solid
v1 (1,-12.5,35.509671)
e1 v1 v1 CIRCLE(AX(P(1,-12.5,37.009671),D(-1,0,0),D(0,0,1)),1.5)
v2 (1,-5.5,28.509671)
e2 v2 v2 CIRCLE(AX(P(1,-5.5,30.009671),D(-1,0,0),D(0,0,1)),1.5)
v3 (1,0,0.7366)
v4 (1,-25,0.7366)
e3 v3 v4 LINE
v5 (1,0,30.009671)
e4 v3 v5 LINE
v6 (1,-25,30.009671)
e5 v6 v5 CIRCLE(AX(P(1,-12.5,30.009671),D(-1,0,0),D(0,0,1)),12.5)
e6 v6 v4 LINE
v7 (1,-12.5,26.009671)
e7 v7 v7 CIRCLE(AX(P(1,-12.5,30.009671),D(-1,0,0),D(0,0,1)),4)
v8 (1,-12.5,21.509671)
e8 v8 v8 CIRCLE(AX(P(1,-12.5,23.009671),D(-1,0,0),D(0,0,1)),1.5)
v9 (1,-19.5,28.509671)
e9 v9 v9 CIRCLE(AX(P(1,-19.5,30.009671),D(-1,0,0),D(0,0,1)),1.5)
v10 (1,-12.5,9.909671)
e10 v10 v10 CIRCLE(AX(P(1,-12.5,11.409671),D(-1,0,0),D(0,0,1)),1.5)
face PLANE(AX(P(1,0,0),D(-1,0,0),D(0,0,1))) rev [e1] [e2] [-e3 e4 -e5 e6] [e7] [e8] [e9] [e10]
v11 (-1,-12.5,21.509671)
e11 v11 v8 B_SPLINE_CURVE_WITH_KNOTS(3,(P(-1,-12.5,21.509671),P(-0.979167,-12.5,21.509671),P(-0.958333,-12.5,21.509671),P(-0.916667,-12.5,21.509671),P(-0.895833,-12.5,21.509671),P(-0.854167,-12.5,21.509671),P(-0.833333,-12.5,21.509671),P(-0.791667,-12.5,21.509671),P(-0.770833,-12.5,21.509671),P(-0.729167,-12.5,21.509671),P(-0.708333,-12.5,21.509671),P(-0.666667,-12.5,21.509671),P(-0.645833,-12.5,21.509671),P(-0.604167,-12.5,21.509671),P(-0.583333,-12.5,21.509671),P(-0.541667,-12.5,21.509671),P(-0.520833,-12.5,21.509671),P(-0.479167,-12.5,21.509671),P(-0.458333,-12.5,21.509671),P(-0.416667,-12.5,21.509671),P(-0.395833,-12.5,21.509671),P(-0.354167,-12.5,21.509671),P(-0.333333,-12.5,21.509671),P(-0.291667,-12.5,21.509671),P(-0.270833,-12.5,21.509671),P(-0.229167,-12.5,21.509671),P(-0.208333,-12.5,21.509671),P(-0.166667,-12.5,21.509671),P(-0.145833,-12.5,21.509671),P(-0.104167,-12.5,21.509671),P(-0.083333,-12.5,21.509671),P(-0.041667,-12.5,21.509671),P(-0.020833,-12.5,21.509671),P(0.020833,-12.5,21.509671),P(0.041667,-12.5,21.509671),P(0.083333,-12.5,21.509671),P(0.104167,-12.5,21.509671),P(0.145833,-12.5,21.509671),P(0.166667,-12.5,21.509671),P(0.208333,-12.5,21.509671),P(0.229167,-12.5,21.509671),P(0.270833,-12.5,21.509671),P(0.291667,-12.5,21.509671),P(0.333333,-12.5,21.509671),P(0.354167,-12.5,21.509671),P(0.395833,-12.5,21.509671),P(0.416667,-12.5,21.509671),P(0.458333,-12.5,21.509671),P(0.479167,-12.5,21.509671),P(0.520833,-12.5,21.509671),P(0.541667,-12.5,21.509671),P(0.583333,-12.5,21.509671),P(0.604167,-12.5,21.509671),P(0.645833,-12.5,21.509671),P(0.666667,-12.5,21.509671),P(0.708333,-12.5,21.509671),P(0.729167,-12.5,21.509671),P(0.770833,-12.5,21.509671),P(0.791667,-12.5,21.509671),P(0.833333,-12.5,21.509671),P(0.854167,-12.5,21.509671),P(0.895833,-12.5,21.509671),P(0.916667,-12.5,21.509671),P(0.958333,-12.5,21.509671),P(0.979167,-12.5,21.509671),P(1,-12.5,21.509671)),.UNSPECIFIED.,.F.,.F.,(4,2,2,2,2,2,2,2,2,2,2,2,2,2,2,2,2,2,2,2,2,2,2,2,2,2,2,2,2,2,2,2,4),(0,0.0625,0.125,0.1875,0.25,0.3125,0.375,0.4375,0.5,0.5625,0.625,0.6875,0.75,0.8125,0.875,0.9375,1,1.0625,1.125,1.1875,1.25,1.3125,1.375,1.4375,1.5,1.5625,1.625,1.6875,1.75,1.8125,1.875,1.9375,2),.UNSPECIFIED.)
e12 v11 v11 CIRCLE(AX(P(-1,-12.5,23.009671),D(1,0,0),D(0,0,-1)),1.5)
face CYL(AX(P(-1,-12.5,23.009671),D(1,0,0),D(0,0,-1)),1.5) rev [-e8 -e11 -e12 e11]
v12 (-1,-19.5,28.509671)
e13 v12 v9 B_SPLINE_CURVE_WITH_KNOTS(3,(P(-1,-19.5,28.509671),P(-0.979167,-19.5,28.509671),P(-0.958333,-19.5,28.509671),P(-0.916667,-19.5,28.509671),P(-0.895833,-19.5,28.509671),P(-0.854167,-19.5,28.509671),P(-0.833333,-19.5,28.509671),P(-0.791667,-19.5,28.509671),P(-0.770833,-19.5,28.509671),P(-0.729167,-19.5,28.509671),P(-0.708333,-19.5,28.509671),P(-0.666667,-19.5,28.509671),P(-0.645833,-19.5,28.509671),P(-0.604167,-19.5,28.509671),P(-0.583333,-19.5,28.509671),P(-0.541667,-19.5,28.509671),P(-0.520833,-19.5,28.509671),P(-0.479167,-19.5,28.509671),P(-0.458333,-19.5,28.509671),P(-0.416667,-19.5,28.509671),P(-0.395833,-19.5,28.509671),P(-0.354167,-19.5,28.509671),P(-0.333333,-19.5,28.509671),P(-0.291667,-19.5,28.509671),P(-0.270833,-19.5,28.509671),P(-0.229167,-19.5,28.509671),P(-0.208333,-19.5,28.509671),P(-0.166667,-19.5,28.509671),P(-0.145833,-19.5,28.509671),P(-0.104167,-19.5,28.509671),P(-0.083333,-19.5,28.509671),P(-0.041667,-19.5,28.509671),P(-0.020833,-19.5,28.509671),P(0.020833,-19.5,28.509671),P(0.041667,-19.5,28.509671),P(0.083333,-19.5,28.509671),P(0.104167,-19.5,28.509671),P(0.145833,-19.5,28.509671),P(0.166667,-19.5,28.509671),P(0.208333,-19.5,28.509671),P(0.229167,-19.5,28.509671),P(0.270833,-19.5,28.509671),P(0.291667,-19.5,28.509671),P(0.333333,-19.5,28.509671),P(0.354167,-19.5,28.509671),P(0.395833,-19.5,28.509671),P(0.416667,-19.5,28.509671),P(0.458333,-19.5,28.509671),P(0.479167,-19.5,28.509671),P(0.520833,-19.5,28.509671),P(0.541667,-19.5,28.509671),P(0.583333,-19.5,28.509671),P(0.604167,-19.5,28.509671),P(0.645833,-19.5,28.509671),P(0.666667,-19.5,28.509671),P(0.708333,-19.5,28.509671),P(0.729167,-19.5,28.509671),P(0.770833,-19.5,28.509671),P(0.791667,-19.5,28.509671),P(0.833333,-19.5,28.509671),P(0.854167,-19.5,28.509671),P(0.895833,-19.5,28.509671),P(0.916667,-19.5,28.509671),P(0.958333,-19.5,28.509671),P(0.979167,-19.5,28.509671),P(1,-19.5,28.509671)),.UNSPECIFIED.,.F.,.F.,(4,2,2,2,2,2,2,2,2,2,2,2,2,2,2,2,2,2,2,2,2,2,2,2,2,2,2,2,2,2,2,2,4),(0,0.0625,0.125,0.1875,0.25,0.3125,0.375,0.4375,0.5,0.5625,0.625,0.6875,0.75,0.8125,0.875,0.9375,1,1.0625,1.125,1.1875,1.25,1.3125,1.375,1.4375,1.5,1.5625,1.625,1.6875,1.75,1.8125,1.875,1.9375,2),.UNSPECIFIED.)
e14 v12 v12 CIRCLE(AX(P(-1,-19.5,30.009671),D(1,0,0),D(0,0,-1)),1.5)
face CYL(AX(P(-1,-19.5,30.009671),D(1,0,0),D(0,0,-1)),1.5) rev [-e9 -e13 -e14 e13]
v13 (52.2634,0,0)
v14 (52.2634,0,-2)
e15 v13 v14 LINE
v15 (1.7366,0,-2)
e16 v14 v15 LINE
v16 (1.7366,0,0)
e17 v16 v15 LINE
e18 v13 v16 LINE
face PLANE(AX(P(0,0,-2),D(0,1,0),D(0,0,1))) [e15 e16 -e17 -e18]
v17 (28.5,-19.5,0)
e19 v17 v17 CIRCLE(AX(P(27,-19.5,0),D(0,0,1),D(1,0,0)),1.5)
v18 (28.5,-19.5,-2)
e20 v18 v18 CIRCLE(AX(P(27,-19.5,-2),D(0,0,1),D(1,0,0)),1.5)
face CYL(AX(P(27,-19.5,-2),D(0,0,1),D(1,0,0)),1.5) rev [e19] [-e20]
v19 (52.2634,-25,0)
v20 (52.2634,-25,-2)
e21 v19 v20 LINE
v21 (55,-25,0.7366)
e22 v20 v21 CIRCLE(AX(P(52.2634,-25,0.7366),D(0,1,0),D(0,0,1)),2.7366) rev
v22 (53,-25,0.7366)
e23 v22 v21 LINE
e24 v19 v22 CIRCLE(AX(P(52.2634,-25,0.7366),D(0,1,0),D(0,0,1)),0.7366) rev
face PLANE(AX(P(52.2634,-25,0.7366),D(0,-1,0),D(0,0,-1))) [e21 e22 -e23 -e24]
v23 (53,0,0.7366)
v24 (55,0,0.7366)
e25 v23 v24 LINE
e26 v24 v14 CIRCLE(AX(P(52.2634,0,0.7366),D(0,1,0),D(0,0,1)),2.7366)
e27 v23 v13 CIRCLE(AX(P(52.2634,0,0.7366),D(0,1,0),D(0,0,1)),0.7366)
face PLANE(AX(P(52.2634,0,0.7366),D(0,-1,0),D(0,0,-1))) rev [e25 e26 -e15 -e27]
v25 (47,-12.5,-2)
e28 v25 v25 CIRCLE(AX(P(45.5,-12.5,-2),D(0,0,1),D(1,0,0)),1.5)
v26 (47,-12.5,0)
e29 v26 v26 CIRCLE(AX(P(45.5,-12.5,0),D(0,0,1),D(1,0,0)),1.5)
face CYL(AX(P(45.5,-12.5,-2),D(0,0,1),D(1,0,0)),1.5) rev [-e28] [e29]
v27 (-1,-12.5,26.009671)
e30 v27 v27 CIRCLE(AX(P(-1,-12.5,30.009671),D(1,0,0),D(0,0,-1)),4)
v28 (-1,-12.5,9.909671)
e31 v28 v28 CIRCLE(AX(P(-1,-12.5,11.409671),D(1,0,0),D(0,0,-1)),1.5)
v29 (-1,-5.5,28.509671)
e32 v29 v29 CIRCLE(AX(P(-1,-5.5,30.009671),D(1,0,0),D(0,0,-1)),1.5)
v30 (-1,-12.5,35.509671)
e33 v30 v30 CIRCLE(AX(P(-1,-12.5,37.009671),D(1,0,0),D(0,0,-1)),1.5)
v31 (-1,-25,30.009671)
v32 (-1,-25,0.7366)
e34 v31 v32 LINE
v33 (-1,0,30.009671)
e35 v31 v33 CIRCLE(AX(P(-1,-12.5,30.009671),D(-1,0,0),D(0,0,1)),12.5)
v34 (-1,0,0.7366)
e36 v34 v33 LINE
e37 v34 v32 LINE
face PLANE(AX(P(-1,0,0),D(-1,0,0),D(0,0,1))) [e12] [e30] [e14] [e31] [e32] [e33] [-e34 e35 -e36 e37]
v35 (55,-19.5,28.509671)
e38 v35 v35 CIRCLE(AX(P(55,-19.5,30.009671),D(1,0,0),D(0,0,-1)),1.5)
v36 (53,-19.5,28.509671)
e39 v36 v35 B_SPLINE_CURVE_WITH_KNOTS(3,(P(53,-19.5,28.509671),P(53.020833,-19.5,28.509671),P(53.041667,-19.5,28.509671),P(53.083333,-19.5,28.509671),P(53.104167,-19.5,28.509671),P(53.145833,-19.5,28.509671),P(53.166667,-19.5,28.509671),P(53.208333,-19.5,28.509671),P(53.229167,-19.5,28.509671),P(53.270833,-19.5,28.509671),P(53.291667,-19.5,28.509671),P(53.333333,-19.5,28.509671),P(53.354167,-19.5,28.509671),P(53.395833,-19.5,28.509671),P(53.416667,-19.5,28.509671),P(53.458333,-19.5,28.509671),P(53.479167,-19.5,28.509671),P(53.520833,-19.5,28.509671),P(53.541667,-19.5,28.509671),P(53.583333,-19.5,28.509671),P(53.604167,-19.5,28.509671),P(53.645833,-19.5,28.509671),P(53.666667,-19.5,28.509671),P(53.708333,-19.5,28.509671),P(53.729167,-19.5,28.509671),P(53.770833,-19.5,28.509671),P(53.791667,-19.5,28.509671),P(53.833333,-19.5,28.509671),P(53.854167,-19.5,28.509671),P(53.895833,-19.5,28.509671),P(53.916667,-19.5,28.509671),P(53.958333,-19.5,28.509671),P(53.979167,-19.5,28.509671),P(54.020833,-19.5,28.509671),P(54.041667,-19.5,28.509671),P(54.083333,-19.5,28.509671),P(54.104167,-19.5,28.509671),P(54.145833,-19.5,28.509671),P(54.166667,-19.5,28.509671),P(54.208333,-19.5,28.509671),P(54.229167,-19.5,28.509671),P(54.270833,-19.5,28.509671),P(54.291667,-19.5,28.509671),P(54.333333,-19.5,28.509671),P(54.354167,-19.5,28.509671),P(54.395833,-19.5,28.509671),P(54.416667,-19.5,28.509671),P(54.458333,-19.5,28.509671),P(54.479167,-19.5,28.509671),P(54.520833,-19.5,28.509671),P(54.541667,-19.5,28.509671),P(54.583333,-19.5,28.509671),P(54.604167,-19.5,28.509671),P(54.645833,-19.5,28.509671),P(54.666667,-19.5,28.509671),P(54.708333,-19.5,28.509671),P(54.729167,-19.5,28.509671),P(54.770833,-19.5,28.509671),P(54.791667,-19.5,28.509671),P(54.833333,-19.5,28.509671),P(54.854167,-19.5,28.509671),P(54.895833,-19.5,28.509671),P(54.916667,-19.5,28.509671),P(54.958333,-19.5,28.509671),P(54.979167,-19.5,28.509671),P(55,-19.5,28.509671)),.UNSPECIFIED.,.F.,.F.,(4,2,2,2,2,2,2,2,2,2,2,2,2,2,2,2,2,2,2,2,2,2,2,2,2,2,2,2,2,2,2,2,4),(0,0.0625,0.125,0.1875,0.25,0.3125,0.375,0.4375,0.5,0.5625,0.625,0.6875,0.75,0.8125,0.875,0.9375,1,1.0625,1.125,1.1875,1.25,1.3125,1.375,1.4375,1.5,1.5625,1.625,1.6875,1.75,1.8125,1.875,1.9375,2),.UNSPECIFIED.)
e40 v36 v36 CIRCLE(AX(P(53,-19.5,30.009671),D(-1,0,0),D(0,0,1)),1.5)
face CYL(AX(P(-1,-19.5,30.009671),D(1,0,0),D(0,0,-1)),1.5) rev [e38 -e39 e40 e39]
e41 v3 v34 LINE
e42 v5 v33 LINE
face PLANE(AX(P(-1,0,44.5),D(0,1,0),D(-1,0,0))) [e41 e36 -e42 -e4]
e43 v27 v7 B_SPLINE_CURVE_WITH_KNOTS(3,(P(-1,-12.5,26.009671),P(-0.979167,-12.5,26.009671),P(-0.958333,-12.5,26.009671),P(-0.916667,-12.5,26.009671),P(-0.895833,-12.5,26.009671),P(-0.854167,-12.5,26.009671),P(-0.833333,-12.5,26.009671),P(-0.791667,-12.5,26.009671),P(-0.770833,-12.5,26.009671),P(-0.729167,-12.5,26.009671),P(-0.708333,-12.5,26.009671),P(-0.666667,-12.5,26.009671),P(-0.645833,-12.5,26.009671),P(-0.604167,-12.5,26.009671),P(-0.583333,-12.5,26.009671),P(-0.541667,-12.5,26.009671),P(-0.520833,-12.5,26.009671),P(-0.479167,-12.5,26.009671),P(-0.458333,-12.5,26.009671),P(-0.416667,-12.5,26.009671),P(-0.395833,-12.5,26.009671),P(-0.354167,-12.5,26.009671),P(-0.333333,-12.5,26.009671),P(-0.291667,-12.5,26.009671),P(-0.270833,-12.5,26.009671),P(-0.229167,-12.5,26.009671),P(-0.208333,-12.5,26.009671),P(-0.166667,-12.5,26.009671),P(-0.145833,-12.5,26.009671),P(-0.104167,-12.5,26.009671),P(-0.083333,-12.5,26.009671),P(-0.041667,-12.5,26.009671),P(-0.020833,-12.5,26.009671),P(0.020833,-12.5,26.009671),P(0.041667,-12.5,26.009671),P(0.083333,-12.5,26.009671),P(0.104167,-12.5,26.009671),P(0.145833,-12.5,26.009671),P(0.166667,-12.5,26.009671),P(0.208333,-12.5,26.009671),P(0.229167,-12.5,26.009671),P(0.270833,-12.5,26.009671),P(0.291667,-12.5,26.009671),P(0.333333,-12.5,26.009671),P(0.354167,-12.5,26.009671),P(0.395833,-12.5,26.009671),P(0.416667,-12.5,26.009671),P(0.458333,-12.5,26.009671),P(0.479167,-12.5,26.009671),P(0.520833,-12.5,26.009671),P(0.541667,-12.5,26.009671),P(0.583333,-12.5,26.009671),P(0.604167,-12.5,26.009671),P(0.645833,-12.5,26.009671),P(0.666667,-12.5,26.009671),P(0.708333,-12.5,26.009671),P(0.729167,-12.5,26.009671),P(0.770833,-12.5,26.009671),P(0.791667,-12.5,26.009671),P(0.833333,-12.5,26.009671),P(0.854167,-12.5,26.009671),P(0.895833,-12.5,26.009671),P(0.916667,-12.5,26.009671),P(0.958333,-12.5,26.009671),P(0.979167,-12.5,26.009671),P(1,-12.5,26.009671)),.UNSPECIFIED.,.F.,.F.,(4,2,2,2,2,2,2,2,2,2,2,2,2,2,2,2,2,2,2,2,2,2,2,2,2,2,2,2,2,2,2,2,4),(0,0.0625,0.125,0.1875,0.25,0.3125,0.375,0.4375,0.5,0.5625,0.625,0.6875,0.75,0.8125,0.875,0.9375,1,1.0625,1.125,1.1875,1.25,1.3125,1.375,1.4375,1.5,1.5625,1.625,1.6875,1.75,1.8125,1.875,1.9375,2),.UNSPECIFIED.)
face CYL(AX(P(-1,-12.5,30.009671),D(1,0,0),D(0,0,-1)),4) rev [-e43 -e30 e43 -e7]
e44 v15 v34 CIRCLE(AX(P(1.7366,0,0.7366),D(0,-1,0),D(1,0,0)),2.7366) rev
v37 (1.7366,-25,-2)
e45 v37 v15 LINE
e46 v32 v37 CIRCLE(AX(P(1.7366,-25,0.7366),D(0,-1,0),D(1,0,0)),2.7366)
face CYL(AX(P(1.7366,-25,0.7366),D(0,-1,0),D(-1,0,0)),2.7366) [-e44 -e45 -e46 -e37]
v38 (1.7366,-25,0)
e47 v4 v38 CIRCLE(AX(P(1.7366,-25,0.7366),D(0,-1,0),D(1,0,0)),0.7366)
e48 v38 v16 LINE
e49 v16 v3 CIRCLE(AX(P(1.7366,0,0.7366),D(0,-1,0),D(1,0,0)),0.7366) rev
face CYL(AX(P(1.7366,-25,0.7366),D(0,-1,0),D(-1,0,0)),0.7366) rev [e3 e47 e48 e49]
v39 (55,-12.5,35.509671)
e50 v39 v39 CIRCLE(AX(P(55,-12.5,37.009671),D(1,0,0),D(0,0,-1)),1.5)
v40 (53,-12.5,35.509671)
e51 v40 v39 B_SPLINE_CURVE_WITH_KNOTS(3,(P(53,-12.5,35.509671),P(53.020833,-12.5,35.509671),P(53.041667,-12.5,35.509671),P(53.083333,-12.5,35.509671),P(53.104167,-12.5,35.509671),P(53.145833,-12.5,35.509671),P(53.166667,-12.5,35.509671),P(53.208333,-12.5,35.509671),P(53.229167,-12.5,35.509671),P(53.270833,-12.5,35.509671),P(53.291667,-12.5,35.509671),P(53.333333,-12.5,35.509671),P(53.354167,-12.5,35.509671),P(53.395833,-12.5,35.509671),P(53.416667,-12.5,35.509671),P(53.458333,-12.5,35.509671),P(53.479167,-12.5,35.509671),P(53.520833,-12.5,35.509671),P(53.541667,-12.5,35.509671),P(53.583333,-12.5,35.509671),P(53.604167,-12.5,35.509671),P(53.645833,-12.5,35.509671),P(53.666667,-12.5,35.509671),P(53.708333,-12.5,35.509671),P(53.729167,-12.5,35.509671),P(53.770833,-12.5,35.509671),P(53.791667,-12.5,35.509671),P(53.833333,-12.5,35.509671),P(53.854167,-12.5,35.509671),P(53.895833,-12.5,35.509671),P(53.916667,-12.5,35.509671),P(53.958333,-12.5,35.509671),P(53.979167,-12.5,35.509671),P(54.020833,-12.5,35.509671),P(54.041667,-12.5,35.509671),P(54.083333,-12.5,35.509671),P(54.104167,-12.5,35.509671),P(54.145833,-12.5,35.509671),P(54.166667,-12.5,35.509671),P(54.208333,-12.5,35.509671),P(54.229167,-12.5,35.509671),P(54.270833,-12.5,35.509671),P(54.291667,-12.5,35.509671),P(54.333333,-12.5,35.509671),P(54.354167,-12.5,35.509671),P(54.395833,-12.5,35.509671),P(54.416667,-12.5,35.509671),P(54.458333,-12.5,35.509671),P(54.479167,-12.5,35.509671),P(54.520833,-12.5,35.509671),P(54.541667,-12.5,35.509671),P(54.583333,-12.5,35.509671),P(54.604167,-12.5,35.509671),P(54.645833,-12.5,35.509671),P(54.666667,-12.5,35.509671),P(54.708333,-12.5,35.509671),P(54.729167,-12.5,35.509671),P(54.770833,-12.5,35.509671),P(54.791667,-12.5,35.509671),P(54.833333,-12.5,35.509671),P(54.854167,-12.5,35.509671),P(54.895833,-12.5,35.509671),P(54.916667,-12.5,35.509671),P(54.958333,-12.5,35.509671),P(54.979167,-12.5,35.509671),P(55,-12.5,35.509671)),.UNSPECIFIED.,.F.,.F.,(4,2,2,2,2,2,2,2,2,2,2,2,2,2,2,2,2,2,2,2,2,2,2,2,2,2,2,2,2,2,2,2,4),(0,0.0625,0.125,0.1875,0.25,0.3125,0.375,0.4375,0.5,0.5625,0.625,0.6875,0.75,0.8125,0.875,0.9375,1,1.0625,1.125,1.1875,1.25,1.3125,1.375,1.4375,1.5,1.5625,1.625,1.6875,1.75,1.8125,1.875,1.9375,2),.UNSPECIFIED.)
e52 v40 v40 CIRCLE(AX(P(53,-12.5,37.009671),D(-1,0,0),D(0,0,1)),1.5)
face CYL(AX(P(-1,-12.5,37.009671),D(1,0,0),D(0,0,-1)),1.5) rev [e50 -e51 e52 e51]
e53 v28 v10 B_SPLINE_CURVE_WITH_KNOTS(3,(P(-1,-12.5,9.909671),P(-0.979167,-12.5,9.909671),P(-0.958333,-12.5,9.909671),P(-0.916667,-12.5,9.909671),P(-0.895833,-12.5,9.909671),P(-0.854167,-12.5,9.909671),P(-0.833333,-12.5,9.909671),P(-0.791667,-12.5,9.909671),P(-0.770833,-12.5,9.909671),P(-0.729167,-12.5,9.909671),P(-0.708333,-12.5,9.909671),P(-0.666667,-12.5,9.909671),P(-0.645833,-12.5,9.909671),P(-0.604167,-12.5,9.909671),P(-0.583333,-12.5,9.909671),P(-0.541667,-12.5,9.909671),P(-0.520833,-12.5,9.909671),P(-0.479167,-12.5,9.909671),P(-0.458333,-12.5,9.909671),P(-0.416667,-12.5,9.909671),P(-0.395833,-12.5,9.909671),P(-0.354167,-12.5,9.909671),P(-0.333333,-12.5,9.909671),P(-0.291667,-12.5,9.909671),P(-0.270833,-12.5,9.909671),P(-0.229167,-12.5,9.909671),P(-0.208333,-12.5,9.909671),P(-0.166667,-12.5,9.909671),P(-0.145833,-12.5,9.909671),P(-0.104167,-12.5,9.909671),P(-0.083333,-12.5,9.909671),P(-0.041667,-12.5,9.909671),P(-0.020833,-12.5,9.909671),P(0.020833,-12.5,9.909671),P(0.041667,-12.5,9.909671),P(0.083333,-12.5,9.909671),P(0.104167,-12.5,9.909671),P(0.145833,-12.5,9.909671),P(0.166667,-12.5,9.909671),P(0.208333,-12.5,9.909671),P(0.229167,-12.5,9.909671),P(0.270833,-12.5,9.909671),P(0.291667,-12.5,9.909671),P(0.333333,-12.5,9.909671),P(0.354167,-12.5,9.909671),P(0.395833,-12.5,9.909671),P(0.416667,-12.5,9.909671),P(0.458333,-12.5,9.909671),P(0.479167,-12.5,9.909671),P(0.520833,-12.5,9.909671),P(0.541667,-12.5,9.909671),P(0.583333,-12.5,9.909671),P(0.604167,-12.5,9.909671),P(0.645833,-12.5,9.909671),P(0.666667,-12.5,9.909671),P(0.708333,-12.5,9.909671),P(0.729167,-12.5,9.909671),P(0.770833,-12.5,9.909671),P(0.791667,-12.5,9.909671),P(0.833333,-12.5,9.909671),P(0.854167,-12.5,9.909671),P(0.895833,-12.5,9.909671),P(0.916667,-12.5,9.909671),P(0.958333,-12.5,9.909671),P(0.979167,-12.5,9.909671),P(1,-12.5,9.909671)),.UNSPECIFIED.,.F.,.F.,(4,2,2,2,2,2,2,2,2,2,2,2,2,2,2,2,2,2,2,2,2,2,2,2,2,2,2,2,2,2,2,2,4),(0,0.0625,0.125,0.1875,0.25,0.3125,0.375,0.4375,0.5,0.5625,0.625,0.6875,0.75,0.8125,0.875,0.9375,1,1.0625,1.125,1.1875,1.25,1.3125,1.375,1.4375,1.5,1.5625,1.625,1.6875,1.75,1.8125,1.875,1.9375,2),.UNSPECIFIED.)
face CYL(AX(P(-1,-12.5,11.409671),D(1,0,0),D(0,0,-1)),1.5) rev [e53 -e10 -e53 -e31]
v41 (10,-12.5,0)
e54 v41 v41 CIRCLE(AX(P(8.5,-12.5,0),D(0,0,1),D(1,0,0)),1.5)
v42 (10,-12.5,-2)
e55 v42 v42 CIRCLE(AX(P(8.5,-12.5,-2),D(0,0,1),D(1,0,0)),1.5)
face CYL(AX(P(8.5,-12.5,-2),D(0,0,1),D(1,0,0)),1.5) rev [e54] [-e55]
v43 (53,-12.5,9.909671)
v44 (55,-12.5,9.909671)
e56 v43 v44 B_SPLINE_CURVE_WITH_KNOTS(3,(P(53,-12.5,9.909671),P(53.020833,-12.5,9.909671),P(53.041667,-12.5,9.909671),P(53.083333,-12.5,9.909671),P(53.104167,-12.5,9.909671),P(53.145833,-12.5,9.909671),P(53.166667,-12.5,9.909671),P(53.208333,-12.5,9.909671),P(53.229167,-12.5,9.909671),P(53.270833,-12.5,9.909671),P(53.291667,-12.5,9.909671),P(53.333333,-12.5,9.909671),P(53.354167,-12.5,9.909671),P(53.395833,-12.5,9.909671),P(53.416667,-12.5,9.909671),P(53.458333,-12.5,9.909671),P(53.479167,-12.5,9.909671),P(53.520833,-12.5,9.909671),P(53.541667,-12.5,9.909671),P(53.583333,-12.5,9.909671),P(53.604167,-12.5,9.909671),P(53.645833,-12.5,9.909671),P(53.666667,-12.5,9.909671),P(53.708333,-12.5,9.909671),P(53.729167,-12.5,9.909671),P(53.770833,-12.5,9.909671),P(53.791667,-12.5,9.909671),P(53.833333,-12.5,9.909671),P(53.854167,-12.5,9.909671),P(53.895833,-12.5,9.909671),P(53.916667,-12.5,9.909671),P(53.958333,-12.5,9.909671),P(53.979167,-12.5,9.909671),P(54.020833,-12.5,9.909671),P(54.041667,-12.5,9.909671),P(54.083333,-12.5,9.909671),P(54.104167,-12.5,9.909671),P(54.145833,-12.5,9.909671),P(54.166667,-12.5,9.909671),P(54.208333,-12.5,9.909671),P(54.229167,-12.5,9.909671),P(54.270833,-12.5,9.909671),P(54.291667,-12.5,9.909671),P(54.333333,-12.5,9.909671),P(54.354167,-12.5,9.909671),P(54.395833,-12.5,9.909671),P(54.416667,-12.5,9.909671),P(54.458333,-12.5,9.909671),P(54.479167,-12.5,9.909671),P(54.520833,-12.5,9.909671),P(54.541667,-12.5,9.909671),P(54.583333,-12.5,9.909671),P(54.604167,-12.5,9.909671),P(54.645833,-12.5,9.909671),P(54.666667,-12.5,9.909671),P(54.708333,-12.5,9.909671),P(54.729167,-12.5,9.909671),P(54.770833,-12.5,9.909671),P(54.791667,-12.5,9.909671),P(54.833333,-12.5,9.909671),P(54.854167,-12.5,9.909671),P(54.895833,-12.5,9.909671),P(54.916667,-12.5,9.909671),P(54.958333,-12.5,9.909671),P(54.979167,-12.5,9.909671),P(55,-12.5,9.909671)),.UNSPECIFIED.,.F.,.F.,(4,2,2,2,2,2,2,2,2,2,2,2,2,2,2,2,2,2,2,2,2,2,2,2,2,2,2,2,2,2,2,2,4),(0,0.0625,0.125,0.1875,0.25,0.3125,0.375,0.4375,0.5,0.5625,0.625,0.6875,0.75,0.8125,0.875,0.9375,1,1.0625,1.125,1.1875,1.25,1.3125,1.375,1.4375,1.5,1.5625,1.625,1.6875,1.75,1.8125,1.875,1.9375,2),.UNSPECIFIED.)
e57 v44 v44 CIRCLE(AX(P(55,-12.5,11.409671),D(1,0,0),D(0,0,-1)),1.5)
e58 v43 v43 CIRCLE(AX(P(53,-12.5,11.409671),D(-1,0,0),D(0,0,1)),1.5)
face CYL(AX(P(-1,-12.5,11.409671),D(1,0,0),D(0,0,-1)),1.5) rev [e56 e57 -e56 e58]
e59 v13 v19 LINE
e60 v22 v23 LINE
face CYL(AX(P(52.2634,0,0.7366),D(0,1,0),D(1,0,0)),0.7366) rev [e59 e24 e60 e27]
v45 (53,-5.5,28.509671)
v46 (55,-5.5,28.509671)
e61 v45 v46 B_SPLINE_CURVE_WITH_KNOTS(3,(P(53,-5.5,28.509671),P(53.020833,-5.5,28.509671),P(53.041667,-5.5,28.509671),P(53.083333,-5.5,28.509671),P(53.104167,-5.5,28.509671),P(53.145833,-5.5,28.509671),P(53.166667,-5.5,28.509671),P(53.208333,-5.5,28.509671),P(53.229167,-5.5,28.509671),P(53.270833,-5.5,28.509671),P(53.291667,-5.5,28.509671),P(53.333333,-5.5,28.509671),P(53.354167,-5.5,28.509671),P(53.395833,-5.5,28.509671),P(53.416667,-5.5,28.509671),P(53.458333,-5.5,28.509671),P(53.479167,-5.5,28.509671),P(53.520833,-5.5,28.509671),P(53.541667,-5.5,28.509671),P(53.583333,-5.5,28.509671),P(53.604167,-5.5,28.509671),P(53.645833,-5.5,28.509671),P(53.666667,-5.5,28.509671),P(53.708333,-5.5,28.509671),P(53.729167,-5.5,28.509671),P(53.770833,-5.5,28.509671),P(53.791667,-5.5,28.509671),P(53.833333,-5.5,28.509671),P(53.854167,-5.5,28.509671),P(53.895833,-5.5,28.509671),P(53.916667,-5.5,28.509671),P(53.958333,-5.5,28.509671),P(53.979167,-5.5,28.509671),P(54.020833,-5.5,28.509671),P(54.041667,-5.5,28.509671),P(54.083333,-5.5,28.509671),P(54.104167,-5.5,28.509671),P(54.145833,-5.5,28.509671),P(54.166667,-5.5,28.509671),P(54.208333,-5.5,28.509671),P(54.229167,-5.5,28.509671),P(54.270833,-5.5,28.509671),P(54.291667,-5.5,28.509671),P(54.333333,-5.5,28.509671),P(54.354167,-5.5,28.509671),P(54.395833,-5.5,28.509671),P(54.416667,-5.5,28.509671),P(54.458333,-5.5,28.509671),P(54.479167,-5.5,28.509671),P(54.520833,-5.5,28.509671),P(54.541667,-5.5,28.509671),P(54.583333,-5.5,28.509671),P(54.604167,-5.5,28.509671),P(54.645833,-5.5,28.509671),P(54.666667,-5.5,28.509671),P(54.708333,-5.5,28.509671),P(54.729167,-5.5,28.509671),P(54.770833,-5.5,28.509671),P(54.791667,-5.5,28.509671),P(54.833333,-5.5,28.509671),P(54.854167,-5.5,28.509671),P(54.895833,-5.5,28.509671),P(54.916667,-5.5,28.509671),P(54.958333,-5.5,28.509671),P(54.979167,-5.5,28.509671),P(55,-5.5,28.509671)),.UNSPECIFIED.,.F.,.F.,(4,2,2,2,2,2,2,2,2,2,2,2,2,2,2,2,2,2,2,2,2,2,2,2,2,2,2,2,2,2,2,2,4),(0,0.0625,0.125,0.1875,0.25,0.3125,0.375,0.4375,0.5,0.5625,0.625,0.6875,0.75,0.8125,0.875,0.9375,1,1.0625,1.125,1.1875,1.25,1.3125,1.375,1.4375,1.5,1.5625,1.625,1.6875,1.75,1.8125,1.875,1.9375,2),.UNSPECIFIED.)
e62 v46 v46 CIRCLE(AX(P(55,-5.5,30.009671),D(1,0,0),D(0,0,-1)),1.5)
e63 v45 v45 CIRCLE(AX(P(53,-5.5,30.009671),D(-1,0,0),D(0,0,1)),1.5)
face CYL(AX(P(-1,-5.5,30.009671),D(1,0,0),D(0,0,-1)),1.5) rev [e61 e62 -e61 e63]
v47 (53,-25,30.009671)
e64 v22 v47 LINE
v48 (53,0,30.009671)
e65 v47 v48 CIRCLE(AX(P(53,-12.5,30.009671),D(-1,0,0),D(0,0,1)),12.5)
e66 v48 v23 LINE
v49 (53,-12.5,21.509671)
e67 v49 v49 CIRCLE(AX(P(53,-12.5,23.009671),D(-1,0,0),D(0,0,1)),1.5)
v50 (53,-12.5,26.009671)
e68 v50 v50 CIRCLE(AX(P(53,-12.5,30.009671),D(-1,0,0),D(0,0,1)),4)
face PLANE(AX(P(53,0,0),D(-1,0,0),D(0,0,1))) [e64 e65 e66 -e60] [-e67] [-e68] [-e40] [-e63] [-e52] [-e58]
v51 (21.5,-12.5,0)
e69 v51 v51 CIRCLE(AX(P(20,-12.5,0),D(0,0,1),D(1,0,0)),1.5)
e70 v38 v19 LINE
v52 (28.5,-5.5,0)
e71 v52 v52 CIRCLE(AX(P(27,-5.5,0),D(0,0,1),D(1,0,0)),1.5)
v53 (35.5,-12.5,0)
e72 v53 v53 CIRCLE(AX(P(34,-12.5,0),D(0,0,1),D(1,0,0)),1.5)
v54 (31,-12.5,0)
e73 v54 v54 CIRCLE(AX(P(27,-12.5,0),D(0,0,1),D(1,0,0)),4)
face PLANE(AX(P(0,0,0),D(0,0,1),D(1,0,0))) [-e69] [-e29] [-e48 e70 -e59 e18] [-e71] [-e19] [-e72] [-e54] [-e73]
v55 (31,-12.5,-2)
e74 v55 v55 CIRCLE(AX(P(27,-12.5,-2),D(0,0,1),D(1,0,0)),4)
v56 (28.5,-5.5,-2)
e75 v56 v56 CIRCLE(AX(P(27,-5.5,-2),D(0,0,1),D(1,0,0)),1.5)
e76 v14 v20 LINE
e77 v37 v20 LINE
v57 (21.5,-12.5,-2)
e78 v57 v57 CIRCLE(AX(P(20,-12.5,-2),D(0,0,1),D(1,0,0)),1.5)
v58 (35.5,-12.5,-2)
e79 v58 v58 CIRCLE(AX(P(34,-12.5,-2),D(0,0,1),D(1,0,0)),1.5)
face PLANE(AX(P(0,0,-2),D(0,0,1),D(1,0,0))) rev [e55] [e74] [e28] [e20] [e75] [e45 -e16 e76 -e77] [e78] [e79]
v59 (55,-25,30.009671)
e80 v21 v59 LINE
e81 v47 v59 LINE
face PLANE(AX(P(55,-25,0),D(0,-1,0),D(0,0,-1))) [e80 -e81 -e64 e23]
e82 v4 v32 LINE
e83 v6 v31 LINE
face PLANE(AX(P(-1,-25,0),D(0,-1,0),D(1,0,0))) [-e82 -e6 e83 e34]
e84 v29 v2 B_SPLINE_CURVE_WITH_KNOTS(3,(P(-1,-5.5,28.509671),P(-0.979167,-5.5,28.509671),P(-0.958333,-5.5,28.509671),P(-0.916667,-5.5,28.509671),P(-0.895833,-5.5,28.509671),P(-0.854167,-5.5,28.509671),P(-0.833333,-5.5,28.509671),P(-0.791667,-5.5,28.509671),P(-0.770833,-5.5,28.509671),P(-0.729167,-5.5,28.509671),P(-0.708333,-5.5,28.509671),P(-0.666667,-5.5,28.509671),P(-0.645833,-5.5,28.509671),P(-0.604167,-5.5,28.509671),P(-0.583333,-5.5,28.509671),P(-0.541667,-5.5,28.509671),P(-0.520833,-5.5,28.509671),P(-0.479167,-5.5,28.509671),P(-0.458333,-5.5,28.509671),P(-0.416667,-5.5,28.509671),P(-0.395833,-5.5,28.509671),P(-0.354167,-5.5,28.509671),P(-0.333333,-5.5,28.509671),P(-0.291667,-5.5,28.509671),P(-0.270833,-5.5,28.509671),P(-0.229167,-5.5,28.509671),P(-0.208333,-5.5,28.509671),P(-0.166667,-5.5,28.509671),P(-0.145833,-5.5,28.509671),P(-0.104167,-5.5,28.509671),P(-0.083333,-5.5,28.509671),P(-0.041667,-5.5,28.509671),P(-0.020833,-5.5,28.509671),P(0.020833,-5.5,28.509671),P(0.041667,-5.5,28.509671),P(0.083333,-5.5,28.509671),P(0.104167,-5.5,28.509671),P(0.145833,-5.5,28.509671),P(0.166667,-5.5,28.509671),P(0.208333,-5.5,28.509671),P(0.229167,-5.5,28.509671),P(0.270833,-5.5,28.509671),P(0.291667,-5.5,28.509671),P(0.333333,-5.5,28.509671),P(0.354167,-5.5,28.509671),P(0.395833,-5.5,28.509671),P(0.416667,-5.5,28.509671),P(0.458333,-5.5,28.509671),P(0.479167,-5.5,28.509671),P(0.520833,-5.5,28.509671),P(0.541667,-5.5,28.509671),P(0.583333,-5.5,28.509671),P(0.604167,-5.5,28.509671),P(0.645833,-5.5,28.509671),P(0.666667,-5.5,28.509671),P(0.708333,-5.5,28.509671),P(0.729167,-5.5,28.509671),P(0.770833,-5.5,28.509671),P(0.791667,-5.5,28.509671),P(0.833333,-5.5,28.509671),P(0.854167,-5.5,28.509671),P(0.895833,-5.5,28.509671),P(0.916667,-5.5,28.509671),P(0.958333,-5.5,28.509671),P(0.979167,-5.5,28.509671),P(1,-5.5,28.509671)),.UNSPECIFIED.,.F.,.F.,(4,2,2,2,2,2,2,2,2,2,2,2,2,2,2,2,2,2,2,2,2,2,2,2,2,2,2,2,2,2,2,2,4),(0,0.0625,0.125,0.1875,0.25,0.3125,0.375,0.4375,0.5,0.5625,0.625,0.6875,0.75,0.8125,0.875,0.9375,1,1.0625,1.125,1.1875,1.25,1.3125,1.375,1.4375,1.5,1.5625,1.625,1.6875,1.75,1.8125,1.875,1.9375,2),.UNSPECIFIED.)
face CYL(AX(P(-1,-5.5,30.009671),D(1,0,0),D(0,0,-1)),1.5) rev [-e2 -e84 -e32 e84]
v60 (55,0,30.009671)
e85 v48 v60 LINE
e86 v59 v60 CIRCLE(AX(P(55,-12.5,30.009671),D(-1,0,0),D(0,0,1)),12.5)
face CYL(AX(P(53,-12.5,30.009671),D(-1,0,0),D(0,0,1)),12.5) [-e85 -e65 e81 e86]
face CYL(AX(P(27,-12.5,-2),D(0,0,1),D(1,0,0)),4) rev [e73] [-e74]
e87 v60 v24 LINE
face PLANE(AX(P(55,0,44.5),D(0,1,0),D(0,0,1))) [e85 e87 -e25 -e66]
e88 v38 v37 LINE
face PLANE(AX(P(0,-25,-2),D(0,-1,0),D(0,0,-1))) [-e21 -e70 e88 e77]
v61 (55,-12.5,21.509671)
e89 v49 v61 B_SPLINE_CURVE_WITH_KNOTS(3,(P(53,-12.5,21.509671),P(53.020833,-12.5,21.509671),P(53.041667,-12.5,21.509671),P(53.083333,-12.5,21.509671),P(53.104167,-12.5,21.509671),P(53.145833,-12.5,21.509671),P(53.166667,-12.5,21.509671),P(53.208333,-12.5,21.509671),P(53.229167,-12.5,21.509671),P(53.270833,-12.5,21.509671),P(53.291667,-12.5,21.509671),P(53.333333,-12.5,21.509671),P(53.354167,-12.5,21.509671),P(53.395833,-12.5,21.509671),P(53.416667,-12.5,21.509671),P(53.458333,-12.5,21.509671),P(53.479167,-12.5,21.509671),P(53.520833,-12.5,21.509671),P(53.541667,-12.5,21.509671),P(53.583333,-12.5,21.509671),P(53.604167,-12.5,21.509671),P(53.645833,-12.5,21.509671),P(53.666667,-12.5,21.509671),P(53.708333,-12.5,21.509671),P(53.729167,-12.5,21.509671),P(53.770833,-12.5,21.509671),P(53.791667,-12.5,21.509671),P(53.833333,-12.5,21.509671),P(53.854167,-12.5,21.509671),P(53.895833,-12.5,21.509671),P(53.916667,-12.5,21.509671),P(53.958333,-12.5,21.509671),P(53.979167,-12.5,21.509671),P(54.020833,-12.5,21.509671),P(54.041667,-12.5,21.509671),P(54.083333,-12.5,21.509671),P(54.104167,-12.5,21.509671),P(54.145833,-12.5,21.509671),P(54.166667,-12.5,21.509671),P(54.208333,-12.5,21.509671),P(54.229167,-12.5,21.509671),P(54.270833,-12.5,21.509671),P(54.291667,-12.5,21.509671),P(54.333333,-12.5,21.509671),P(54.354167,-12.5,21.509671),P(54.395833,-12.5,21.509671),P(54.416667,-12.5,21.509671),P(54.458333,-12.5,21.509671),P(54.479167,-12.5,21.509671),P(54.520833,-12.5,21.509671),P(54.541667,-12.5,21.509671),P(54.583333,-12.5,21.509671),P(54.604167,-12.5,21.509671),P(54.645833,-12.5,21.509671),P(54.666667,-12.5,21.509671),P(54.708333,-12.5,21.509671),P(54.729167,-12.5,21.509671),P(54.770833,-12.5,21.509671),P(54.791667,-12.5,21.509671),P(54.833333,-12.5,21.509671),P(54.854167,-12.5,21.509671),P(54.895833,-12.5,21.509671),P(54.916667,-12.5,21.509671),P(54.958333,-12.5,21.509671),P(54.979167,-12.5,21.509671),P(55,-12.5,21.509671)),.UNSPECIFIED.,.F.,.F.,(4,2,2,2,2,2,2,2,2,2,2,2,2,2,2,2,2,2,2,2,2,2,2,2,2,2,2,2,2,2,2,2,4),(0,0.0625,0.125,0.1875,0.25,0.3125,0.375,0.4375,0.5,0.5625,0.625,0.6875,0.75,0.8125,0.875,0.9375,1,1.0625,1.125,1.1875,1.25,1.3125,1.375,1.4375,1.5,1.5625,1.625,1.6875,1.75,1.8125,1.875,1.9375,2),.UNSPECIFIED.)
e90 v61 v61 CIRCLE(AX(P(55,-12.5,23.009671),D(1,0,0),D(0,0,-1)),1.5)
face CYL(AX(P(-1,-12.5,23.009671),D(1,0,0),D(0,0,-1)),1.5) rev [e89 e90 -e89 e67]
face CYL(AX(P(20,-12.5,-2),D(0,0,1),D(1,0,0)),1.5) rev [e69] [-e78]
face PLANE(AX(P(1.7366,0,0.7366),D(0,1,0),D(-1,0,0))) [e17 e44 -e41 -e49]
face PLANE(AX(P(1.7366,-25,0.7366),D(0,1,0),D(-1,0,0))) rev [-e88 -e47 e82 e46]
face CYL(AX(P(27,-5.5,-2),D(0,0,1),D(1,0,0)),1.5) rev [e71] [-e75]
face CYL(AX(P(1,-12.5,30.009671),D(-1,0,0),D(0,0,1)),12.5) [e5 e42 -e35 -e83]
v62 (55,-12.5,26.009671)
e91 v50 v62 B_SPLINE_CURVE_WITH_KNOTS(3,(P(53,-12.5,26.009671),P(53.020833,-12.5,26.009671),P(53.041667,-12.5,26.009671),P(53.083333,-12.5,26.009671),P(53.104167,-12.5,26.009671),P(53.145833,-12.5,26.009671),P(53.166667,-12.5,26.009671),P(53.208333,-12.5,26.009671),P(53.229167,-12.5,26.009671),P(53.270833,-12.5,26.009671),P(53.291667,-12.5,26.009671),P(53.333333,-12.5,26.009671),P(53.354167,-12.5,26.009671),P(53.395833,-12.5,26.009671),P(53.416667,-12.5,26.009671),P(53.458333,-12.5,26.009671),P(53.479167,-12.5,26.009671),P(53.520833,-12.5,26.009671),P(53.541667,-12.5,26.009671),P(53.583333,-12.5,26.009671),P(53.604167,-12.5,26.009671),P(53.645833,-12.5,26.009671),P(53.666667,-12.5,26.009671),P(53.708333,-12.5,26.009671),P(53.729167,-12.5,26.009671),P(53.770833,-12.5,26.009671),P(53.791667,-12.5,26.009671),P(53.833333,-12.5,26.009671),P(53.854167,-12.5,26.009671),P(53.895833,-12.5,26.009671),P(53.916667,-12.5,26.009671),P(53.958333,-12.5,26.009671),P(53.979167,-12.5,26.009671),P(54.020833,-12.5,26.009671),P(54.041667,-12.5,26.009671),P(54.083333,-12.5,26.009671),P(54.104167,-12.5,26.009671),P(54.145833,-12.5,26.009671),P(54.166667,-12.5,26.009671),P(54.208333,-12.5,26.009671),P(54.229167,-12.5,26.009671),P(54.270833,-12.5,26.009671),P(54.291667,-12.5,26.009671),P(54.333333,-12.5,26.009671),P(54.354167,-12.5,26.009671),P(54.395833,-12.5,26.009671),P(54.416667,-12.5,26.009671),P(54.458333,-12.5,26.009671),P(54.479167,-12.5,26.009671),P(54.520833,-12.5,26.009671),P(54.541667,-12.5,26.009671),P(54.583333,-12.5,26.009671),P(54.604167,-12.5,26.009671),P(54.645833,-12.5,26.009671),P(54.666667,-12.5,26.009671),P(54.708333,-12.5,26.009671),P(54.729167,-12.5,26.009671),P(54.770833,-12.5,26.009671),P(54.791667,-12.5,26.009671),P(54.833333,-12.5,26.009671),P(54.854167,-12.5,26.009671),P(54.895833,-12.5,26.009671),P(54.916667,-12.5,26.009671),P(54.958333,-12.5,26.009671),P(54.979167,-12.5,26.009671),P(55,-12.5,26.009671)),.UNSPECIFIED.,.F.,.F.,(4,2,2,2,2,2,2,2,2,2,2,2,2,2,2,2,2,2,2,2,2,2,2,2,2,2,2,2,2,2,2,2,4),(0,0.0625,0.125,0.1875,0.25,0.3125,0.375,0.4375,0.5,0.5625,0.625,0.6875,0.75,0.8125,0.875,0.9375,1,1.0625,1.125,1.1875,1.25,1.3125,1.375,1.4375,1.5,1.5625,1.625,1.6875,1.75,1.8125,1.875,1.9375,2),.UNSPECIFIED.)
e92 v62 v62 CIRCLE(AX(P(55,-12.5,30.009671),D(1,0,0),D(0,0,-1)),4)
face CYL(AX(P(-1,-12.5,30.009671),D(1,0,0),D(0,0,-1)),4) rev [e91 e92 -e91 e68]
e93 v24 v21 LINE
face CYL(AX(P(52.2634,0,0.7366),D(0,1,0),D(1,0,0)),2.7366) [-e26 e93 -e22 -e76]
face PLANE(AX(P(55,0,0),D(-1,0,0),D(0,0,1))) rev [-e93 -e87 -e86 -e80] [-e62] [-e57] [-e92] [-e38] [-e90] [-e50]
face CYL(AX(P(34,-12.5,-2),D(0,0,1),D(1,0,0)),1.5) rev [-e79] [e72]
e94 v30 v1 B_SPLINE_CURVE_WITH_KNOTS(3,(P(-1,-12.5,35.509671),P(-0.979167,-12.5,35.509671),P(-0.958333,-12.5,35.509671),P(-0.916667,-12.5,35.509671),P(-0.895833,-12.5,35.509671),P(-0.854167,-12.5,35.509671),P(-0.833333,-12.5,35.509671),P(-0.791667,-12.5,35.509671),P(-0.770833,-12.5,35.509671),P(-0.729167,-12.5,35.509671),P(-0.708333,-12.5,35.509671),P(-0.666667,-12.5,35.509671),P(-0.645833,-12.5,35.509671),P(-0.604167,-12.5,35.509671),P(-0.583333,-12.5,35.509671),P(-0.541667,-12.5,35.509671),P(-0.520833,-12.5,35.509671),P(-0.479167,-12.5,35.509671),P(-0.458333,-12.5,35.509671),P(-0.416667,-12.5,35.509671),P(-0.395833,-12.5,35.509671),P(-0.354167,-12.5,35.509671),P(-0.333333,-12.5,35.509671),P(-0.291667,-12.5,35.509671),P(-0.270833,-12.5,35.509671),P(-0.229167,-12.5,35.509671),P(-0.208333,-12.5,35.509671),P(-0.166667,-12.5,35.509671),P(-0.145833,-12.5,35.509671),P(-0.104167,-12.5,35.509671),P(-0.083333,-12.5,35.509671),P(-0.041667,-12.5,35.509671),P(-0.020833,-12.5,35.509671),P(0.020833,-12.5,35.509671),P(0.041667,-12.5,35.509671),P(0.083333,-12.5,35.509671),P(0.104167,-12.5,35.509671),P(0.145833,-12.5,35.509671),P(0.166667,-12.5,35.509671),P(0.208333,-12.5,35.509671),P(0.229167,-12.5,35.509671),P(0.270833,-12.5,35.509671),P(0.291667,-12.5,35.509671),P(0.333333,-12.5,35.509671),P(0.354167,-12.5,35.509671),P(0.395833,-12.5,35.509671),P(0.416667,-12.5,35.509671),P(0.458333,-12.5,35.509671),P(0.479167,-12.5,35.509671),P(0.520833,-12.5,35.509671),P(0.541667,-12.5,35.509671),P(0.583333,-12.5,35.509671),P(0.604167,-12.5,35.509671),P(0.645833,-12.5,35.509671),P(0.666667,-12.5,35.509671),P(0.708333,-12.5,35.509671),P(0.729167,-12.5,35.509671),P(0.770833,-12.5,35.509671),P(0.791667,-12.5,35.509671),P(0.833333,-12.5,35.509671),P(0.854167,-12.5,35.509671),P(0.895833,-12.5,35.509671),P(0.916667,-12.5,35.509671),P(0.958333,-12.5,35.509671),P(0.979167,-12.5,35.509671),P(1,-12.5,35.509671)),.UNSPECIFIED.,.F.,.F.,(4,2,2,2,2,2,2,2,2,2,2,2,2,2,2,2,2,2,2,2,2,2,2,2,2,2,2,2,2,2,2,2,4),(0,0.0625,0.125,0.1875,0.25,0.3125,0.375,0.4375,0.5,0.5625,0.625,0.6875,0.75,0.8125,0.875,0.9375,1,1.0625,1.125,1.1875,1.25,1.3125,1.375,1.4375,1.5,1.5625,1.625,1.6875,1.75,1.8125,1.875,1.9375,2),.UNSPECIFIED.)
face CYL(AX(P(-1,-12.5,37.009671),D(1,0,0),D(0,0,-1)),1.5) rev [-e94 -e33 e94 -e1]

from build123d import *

# Parameters (mm, degrees)
SKETCH_1_W                         = 54
SKETCH_1_H                         = 25
SKETCH_1_R                         = 4
SKETCH_1_R_2                       = 1.5
SM_BASE_FLANGE_1_DEPTH             = 2
SM_EDGE_FLANGE_1_STRIP_W           = 10.4732
SM_EDGE_FLANGE_1_STRIP_H           = 2
SM_EDGE_FLANGE_1_STRIP_CUT_DEPTH   = 25
SM_EDGE_FLANGE_1_STRIP_2_W         = 10.4732
SM_EDGE_FLANGE_1_STRIP_2_H         = 2
SM_EDGE_FLANGE_1_STRIP_CUT_2_DEPTH = 25
SM_EDGE_FLANGE_1_DEPTH             = 25
SM_EDGE_FLANGE_1_BEND_DEPTH        = 25
CUT_EXTRUDE_2_DEPTH                = 76.771036683
SKETCH_13_R                        = 4
SKETCH_13_R_2                      = 1.5
CUT_EXTRUDE_3_DEPTH                = 75.619515469


# Sheet-metal steps are written as plain solids
with BuildPart() as part:
    # Sketch 1 → 基体-法兰1 (new body)
    with BuildSketch(Plane.XY):
        with Locations((27, -12.5)):
            Rectangle(SKETCH_1_W, SKETCH_1_H)
        with Locations((27, -12.5)):
            Circle(SKETCH_1_R, mode=Mode.SUBTRACT)
        with Locations((27, -5.5)):
            Circle(SKETCH_1_R_2, mode=Mode.SUBTRACT)
        with Locations((27, -19.5)):
            Circle(SKETCH_1_R_2, mode=Mode.SUBTRACT)
        with Locations((34, -12.5)):
            Circle(SKETCH_1_R_2, mode=Mode.SUBTRACT)
        with Locations((20, -12.5)):
            Circle(SKETCH_1_R_2, mode=Mode.SUBTRACT)
        with Locations((45.5, -12.5)):
            Circle(SKETCH_1_R_2, mode=Mode.SUBTRACT)
        with Locations((8.5, -12.5)):
            Circle(SKETCH_1_R_2, mode=Mode.SUBTRACT)
    extrude(amount=-SM_BASE_FLANGE_1_DEPTH)

    # 边线-法兰1 strip (across the edge) → 边线-法兰1 strip cut (cut)
    with BuildSketch(Plane(origin=(-1, 0, 0), x_dir=(1, 0, 0), z_dir=(0, -1, 0))):
        with Locations((-2.5, -1)):
            Rectangle(SM_EDGE_FLANGE_1_STRIP_W, SM_EDGE_FLANGE_1_STRIP_H)
    extrude(amount=SM_EDGE_FLANGE_1_STRIP_CUT_DEPTH, mode=Mode.SUBTRACT)

    # 边线-法兰1 strip 2 (across the edge) → 边线-法兰1 strip cut 2 (cut)
    with BuildSketch(Plane(origin=(55, -25, 0), x_dir=(-1, 0, 0), z_dir=(0, 1, 0))):
        with Locations((-2.5, -1)):
            Rectangle(SM_EDGE_FLANGE_1_STRIP_2_W, SM_EDGE_FLANGE_1_STRIP_2_H)
    extrude(amount=SM_EDGE_FLANGE_1_STRIP_CUT_2_DEPTH, mode=Mode.SUBTRACT)

    # 边线-法兰1 section (across the edge) → 边线-法兰1 (add)
    with BuildSketch(Plane(origin=(-1, 0, 0), x_dir=(1, 0, 0), z_dir=(0, -1, 0))):
        with BuildLine():
            Line((0, 0.7366), (0, 44.5))
            Line((0, 44.5), (2, 44.5))
            Line((2, 44.5), (2, 0.7366))
            ThreePointArc((2, 0.7366), (2.215745145, 0.215745145), (2.7366, 0))
            Line((2.7366, 0), (2.7366, -2))
            ThreePointArc((2.7366, -2), (0.801531583, -1.198468417), (0, 0.7366))
        make_face()
    extrude(amount=SM_EDGE_FLANGE_1_DEPTH)

    # 边线-法兰1 section 2 (across the edge) → 边线-法兰1 bend (add)
    with BuildSketch(Plane(origin=(55, -25, 0), x_dir=(-1, 0, 0), z_dir=(0, 1, 0))):
        with BuildLine():
            Line((0, 0.7366), (0, 44.5))
            Line((0, 44.5), (2, 44.5))
            Line((2, 44.5), (2, 0.7366))
            ThreePointArc((2, 0.7366), (2.215745145, 0.215745145), (2.7366, 0))
            Line((2.7366, 0), (2.7366, -2))
            ThreePointArc((2.7366, -2), (0.801531583, -1.198468417), (0, 0.7366))
        make_face()
    extrude(amount=SM_EDGE_FLANGE_1_BEND_DEPTH)

    # 草图12 → 切除-拉伸2 (cut, through all)
    with BuildSketch(Plane(origin=(55, 0, 0), x_dir=(0, 0, -1), z_dir=(1, 0, 0))):
        with BuildLine():
            ThreePointArc((-30.009670534, -25), (-42.509670534, -12.5), (-30.009670534, 0))
            Line((-30.009670534, 0), (-44.5, 0))
            Line((-44.5, 0), (-44.5, -25))
            Line((-44.5, -25), (-30.009670534, -25))
        make_face()
    extrude(amount=-CUT_EXTRUDE_2_DEPTH, mode=Mode.SUBTRACT)

    # 草图13 → 切除-拉伸3 (cut, through all)
    with BuildSketch(Plane(origin=(55, 0, 0), x_dir=(0, 0, -1), z_dir=(1, 0, 0))):
        with Locations((-30.009670534, -12.5)):
            Circle(SKETCH_13_R)
        with Locations((-30.009670534, -19.5)):
            Circle(SKETCH_13_R_2)
        with Locations((-37.009670534, -12.5)):
            Circle(SKETCH_13_R_2)
        with Locations((-30.009670534, -5.5)):
            Circle(SKETCH_13_R_2)
        with Locations((-23.009670534, -12.5)):
            Circle(SKETCH_13_R_2)
        with Locations((-11.409670534, -12.5)):
            Circle(SKETCH_13_R_2)
    extrude(amount=-CUT_EXTRUDE_3_DEPTH, mode=Mode.SUBTRACT)


solid = part.part
